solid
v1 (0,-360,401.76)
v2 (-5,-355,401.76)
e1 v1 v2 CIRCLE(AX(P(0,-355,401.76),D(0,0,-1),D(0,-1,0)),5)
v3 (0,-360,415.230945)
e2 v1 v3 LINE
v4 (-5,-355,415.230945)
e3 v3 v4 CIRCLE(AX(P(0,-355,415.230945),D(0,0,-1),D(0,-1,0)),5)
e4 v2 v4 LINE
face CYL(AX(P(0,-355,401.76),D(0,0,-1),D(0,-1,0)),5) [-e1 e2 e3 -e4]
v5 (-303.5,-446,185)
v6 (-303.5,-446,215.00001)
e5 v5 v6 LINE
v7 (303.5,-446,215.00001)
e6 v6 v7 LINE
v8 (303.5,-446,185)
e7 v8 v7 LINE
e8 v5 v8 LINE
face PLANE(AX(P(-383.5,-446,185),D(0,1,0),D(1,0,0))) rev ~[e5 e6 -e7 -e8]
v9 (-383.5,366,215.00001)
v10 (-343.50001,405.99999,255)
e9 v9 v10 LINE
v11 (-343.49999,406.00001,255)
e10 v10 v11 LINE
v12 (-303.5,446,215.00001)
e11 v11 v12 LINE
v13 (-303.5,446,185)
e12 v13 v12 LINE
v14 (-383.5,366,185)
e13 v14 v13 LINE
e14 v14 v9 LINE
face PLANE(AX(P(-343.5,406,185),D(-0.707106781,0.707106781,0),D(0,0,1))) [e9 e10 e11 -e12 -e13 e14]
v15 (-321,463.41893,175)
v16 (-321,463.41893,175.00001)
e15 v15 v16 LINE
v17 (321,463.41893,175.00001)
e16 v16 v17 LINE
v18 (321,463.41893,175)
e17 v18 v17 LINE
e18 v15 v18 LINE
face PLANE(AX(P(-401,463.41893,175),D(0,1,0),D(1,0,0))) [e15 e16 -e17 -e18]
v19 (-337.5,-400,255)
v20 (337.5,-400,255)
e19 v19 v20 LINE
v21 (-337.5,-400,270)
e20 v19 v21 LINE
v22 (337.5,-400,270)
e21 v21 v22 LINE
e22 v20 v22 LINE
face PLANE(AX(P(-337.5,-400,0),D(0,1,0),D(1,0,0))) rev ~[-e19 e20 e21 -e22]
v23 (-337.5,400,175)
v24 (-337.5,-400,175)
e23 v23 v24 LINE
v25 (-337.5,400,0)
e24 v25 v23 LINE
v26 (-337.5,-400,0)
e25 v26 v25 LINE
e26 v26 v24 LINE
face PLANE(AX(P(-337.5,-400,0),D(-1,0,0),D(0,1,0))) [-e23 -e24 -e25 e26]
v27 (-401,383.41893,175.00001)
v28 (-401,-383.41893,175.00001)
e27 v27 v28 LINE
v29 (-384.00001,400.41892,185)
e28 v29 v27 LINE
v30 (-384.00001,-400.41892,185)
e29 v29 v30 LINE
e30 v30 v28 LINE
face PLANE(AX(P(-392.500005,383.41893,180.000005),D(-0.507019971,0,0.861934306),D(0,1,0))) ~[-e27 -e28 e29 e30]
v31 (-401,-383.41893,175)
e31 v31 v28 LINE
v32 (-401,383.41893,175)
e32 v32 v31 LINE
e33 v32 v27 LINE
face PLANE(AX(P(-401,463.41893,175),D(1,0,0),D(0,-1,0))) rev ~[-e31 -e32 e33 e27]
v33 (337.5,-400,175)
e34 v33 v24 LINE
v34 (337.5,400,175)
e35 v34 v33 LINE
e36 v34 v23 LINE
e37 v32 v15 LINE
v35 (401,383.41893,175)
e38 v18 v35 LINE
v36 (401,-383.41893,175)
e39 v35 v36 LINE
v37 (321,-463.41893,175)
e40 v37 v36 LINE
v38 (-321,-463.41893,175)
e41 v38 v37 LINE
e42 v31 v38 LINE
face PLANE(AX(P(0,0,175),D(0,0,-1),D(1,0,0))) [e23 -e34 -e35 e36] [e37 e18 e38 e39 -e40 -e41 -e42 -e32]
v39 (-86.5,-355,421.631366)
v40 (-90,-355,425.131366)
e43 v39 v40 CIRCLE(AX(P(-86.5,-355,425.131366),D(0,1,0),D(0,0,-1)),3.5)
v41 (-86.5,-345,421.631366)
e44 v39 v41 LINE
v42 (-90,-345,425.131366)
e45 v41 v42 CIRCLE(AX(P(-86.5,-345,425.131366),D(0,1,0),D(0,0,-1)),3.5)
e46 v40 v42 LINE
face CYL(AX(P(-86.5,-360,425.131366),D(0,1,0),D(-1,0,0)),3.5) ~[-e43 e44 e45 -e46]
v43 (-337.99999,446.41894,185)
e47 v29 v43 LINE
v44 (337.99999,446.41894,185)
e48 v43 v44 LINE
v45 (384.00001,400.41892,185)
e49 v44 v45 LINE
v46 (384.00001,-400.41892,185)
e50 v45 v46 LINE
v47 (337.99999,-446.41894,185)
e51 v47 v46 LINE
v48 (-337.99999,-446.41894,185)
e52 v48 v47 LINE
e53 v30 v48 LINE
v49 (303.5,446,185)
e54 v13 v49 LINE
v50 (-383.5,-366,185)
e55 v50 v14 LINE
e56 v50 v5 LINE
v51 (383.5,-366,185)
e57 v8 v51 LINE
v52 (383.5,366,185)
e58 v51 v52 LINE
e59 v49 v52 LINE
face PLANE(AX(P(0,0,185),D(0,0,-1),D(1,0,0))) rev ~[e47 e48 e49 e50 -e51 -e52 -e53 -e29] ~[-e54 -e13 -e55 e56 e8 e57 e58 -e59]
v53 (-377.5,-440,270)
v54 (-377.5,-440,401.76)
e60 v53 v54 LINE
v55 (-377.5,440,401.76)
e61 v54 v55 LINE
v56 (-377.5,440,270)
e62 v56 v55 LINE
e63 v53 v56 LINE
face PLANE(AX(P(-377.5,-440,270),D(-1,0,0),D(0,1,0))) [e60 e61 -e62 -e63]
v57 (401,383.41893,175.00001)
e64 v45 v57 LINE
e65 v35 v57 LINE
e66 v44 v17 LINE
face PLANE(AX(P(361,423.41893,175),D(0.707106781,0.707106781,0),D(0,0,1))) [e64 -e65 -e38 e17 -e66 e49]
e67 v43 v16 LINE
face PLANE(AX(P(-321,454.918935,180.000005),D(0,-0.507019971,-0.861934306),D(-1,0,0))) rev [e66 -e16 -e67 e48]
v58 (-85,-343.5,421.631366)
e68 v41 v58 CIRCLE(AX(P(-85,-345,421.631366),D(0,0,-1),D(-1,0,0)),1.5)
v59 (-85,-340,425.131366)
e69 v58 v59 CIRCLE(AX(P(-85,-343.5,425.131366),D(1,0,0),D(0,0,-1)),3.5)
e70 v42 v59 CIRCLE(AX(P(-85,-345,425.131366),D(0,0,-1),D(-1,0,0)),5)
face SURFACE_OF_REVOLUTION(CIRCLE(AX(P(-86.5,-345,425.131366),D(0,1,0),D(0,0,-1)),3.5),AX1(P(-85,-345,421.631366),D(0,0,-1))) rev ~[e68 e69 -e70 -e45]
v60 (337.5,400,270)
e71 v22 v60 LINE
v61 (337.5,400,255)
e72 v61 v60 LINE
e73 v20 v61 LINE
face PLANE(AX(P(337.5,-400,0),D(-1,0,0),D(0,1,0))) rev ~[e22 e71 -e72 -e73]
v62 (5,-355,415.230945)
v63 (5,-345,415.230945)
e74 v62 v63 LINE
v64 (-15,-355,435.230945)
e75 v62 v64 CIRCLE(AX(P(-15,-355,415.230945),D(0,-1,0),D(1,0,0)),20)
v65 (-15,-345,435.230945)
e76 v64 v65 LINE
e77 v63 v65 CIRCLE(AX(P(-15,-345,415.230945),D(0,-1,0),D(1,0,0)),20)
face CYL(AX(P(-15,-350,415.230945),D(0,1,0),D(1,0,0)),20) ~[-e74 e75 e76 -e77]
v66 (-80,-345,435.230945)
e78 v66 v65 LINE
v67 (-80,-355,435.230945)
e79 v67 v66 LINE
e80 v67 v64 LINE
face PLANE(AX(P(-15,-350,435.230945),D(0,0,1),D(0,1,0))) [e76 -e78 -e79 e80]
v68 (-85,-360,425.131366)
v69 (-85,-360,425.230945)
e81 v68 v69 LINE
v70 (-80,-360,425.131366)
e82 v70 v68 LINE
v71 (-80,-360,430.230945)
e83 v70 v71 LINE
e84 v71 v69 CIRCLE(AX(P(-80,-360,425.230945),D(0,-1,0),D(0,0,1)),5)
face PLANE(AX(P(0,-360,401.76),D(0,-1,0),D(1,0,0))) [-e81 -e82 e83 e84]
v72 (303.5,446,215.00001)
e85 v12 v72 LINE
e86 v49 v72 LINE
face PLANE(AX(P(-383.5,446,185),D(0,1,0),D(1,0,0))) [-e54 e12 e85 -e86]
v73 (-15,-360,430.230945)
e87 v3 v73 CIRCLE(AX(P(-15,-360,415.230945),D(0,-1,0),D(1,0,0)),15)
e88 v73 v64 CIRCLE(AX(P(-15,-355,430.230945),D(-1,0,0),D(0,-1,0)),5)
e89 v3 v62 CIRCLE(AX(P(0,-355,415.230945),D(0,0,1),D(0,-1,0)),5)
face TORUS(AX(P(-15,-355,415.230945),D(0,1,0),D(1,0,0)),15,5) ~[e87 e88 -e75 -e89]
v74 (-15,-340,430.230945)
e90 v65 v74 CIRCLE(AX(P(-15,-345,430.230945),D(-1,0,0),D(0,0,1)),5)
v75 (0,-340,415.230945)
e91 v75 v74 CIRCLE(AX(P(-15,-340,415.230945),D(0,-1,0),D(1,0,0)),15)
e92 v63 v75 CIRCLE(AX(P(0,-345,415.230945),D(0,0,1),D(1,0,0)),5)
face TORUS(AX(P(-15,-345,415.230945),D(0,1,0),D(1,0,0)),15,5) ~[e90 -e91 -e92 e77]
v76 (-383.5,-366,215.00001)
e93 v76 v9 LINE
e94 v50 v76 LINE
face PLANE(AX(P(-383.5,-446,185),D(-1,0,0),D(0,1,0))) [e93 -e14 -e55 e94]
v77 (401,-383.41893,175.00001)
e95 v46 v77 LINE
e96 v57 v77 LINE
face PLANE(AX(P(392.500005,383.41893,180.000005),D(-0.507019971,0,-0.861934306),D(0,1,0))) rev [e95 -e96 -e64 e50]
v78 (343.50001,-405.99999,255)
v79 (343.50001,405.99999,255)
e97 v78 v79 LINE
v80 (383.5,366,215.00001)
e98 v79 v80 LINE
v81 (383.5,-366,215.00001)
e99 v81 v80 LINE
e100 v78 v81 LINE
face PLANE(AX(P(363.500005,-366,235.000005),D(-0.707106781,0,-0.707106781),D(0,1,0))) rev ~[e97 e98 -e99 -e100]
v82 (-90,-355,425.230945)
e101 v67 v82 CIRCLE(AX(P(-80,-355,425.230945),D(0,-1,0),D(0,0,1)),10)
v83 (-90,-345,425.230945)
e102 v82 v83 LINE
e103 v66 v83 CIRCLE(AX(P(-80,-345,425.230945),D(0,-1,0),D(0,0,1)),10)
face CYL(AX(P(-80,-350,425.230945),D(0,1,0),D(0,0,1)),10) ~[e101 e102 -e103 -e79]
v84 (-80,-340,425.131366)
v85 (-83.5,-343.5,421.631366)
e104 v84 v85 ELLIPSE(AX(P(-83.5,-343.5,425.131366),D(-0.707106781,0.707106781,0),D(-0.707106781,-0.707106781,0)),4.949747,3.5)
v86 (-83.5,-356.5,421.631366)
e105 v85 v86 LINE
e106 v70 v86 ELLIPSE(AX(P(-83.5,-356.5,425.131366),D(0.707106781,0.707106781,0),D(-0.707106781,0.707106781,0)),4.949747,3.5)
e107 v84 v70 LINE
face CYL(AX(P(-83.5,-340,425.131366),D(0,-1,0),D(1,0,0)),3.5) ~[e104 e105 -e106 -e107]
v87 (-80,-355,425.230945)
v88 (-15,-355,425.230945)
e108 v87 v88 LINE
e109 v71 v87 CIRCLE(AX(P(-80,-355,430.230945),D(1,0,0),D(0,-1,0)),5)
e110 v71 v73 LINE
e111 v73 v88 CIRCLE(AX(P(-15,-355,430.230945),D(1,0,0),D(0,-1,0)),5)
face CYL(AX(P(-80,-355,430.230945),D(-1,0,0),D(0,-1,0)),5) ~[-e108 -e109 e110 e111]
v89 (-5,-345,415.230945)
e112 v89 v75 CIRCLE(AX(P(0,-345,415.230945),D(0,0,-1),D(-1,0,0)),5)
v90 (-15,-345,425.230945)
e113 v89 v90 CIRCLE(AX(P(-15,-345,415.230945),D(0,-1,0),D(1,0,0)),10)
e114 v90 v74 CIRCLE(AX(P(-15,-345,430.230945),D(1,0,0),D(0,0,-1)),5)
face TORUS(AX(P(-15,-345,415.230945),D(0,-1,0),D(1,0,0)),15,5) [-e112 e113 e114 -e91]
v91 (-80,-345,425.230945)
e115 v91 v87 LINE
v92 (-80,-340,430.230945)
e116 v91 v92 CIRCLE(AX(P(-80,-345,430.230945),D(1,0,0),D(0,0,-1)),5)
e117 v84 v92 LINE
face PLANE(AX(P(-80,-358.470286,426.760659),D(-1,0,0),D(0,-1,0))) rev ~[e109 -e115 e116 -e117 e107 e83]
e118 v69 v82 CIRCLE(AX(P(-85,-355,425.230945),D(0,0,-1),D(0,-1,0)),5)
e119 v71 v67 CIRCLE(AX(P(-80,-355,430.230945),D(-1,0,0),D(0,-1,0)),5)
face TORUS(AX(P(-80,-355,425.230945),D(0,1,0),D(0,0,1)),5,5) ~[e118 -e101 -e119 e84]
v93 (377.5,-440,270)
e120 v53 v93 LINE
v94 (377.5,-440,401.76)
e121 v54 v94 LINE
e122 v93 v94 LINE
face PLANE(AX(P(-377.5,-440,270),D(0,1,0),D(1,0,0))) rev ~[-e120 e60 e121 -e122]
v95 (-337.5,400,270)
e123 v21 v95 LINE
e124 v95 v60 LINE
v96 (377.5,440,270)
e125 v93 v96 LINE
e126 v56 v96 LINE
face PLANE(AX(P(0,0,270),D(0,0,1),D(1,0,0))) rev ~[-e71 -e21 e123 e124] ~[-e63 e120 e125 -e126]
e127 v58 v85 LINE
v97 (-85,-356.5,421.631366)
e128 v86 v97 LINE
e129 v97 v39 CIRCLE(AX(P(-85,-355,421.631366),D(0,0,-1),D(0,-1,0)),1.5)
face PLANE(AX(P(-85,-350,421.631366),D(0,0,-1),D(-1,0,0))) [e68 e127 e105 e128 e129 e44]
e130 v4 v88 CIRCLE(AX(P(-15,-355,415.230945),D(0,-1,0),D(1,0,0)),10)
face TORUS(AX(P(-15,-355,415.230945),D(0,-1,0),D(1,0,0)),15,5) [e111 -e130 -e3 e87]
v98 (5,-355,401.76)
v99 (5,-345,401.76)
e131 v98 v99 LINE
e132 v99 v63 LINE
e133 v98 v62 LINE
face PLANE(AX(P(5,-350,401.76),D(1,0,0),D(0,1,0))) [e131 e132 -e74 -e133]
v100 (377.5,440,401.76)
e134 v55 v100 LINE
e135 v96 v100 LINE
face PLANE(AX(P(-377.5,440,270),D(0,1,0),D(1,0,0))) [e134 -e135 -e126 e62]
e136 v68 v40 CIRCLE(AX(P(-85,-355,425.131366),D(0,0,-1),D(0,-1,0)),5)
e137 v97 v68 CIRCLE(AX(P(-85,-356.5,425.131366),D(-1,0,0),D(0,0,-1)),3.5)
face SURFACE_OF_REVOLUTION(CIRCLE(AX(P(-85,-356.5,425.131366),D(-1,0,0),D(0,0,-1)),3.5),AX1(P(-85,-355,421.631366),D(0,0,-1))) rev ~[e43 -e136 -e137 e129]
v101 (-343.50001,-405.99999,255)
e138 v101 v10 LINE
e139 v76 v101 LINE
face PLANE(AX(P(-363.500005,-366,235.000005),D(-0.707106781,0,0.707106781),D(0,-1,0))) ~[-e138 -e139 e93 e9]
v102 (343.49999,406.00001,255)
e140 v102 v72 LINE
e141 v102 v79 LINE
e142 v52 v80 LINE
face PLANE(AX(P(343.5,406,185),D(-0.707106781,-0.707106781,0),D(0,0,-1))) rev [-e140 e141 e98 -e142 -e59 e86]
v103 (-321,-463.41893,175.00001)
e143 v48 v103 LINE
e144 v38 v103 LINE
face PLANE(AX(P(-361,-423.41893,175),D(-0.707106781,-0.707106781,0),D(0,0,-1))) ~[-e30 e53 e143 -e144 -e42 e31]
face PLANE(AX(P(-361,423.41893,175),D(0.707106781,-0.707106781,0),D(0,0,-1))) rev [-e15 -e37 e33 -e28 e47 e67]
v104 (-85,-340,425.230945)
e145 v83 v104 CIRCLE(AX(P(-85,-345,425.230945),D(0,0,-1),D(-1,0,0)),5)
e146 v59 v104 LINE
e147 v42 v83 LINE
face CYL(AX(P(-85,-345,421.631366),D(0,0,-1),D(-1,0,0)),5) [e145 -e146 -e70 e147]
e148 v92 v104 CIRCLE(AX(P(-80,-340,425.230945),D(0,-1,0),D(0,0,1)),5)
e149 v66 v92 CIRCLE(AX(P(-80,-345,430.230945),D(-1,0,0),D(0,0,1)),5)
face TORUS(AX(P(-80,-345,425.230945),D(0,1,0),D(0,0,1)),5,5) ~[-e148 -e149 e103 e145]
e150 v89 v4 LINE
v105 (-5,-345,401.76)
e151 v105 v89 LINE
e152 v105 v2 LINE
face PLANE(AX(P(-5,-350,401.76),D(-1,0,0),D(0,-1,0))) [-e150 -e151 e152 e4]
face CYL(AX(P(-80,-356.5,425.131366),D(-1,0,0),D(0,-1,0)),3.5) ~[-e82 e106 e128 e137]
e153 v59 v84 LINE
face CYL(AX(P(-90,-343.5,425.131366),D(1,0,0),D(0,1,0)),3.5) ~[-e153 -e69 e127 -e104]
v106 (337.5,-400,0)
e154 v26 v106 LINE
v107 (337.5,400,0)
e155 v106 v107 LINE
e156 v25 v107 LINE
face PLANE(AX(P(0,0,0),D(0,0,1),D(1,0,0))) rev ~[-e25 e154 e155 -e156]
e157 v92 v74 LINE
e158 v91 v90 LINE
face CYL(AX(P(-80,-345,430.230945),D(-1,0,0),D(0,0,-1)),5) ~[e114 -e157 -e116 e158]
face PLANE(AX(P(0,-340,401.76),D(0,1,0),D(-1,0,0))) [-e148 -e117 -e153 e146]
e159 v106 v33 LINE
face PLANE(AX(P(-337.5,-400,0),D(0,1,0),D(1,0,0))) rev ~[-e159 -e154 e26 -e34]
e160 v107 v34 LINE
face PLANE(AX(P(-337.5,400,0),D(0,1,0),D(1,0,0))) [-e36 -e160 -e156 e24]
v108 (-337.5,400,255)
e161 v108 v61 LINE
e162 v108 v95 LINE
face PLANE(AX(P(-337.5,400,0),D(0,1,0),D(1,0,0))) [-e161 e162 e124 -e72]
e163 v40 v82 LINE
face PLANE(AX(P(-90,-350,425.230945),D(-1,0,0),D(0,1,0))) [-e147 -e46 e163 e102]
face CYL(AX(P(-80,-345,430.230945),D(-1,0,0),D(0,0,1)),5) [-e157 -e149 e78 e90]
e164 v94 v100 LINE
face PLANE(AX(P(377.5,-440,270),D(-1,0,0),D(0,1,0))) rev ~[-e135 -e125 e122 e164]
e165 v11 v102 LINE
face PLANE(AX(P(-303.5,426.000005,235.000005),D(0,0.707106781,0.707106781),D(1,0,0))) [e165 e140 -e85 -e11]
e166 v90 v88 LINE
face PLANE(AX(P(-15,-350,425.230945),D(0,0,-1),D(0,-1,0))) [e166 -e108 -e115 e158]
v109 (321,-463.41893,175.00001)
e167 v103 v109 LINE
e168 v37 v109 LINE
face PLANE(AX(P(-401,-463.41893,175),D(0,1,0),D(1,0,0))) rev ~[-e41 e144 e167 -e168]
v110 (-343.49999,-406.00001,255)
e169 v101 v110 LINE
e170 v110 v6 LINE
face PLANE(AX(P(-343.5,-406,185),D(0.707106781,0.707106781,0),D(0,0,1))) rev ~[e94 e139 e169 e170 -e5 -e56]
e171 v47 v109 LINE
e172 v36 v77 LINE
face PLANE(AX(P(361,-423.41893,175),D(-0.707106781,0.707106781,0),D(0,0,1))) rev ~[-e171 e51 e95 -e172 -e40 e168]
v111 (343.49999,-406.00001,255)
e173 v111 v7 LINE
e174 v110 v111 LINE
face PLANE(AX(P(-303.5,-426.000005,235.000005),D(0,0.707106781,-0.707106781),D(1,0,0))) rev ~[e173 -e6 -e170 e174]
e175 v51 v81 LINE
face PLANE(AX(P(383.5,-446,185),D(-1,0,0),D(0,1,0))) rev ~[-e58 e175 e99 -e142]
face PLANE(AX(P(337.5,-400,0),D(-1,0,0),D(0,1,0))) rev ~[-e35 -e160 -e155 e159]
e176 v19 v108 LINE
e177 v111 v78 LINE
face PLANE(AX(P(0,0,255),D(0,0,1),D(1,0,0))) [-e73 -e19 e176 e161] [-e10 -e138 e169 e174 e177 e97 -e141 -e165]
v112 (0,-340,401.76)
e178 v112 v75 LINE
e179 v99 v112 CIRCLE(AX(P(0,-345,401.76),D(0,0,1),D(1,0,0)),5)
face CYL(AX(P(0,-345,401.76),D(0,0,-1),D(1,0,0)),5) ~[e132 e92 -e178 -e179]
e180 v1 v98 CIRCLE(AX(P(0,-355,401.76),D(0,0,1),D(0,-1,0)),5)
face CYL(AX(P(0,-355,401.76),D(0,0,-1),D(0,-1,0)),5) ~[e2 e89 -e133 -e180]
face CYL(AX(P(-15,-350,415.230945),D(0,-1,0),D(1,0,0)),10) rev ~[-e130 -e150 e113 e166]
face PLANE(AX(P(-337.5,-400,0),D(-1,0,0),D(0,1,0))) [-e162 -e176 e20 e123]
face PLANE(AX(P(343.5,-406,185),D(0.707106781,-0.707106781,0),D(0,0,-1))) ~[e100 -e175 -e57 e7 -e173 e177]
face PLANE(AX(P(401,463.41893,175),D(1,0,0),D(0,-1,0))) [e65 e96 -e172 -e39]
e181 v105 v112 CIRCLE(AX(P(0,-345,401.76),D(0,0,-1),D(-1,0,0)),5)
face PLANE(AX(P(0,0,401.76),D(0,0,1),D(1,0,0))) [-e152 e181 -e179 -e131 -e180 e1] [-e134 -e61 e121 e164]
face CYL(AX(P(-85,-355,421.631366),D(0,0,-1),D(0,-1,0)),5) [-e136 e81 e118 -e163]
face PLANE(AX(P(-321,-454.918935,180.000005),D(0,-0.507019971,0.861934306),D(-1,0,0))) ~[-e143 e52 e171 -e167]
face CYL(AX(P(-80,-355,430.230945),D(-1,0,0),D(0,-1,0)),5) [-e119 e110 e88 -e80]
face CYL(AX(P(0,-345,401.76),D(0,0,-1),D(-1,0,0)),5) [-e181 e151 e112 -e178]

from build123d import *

# Parameters (mm, degrees)
F0_W          = 675
F0_H          = 800
F1_DEPTH      = 270
F2_W          = 755
F2_H          = 880
F3_DEPTH      = 131.76
F5_START      = -175
F4_W          = 802
F4_H          = 926.8378600104
F5_DEPTH      = 10
F6_W          = 767
F6_H          = 892
F7_DEPTH      = 70
F8_SIZE       = 80
F9_SIZE       = 39.99999
F10_SIZE2     = 9.99999
F10_SIZE      = 16.99999
F13_W         = 10
F13_H         = 20
F15_R         = 3.5
F16_T1_DEPTH  = 65
F16_T3_DEPTH  = 3.5995793343
F16_T5_DEPTH  = 13.4709453487
F16_T8_ANGLE  = 90
F16_T10_ANGLE = 90
F16_T12_ANGLE = 90
F16_T14_ANGLE = 90
F16_T16_ANGLE = 90
F16_T18_ANGLE = 90
F16_T20_ANGLE = 90
F16_T22_ANGLE = 90


# Not quite as in the source:
# - a fillet or chamfer that OpenCascade refuses, or shapes differently, is made with other operations: its cross-section is extruded or revolved along the edge and cut away or added
# - a fillet or chamfer is up to 0.001 mm smaller than in the source, because OpenCascade refuses the exact size
# - a feature names something its author has since deleted; it is built from what else it names


with BuildPart() as f1:
    # F0 (on Top) → F1 (new body)
    with BuildSketch(Plane.XY):
        Rectangle(F0_W, F0_H)
    extrude(amount=F1_DEPTH)

    # F2 (on face) → F3 (join)
    with BuildSketch(Plane.XY.offset(270)):
        Rectangle(F2_W, F2_H)
    extrude(amount=F3_DEPTH)

    # F4 (on face) → F5 (join)
    with BuildSketch(Plane(origin=(0, 0, 0), x_dir=(1, 0, 0), z_dir=(0, 0, -1)).offset(F5_START)):
        Rectangle(F4_W, F4_H)
    extrude(amount=-F5_DEPTH)

    # F6 (on face) → F7 (join)
    with BuildSketch(Plane.XY.offset(185)):
        Rectangle(F6_W, F6_H)
    extrude(amount=F7_DEPTH)

    # F8
    f8_edges = [f1.edges().sort_by_distance(p)[0] for p in [
        (383.5, 446, 220),
        (-383.5, 446, 220),
        (-383.5, -446, 220),
        (-401, 463.41893, 180),
        (-401, -463.41893, 180),
        (401, 463.41893, 180),
        (401, -463.41893, 180),
        (383.5, -446, 220),
    ]]
    chamfer(f8_edges, length=F8_SIZE)

    # F9 (size 40 in the source; OpenCascade refuses exactly that, so slightly less here)
    f9_edges = [f1.edges().sort_by_distance(p)[0] for p in [
        (383.5, 0, 255),
        (-383.5, 0, 255),
        (0, 446, 255),
        (0, -446, 255),
    ]]
    chamfer(f9_edges, length=F9_SIZE)

    # F10 (size 17 and 10 in the source; OpenCascade refuses exactly that, so slightly less here)
    f10_edges = [f1.edges().sort_by_distance(p)[0] for p in [
        (-401, 0, 185),
        (0, 463.41893, 185),
        (0, -463.41893, 185),
        (401, 0, 185),
    ]]
    chamfer(f10_edges, length=F10_SIZE, length2=F10_SIZE2)

    # F14: sweep along a path in F12
    with BuildLine(Plane.XZ.offset(350)) as f14_path:
        Line((0, 401.76), (0, 415.2309453487))
        ThreePointArc((0, 415.2309453487), (-4.3933982822, 425.8375470665), (-15, 430.2309453487))
        Line((-15, 430.2309453487), (-80, 430.2309453487))
        ThreePointArc((-80, 430.2309453487), (-83.5355339059, 428.7664792547), (-85, 425.2309453487))
        Line((-85, 425.2309453487), (-85, 421.6313660145))
    # F13 (on face) → F14 (sweep)
    with BuildSketch(Plane.XY.offset(401.76)):
        with Locations((0, -350)):
            Rectangle(F13_W, F13_H)
    sweep(path=f14_path.line)

    # F15
    f15_edges = [f1.edges().sort_by_distance(p)[0] for p in [
        (-90, -350, 421.631366),
        (-85, -360, 421.631366),
        (-80, -350, 421.631366),
        (-85, -340, 421.631366),
    ]]
    fillet(f15_edges, radius=F15_R)

    # F16: fillet of radius 5 on 16 edges, made by hand

    # F16_s2 → F16_t1 (cut)
    with BuildSketch(Plane.YZ.offset(-80)):
        with BuildLine():
            ThreePointArc((-360, 430.2309453487), (-358.5355339059, 433.7664792547), (-355, 435.2309453487))
            Line((-355, 435.2309453487), (-360, 435.2309453487))
            Line((-360, 435.2309453487), (-360, 430.2309453487))
        make_face()
        with BuildLine():
            ThreePointArc((-345, 435.2309453487), (-341.4644660941, 433.7664792547), (-340, 430.2309453487))
            Line((-340, 430.2309453487), (-340, 435.2309453487))
            Line((-340, 435.2309453487), (-345, 435.2309453487))
        make_face()
        with BuildLine():
            ThreePointArc((-360, 430.2309453487), (-358.5355339059, 426.6954114428), (-355, 425.2309453487))
            Line((-355, 425.2309453487), (-360, 425.2309453487))
            Line((-360, 425.2309453487), (-360, 430.2309453487))
        make_face()
        with BuildLine():
            ThreePointArc((-345, 425.2309453487), (-341.4644660941, 426.6954114428), (-340, 430.2309453487))
            Line((-340, 430.2309453487), (-340, 425.2309453487))
            Line((-340, 425.2309453487), (-345, 425.2309453487))
        make_face()
    extrude(amount=F16_T1_DEPTH, mode=Mode.SUBTRACT)

    # F16_s4 → F16_t3 (cut)
    with BuildSketch(Plane.XY.offset(421.6313660145)):
        with BuildLine():
            ThreePointArc((-85, -360), (-88.5355339059, -358.5355339059), (-90, -355))
            Line((-90, -355), (-90, -360))
            Line((-90, -360), (-85, -360))
        make_face()
        with BuildLine():
            ThreePointArc((-90, -345), (-88.5355339059, -341.4644660941), (-85, -340))
            Line((-85, -340), (-90, -340))
            Line((-90, -340), (-90, -345))
        make_face()
    extrude(amount=F16_T3_DEPTH, mode=Mode.SUBTRACT)

    # F16_s6 → F16_t5 (cut)
    with BuildSketch(Plane.XY.offset(401.76)):
        with BuildLine():
            ThreePointArc((0, -360), (3.5355339059, -358.5355339059), (5, -355))
            Line((5, -355), (5, -360))
            Line((5, -360), (0, -360))
        make_face()
        with BuildLine():
            ThreePointArc((0, -360), (-3.5355339059, -358.5355339059), (-5, -355))
            Line((-5, -355), (-5, -360))
            Line((-5, -360), (0, -360))
        make_face()
        with BuildLine():
            ThreePointArc((5, -345), (3.5355339059, -341.4644660941), (0, -340))
            Line((0, -340), (5, -340))
            Line((5, -340), (5, -345))
        make_face()
        with BuildLine():
            ThreePointArc((-5, -345), (-3.5355339059, -341.4644660941), (0, -340))
            Line((0, -340), (-5, -340))
            Line((-5, -340), (-5, -345))
        make_face()
    extrude(amount=F16_T5_DEPTH, mode=Mode.SUBTRACT)

    # F16_s7 → F16_t8 (revolve, cut)
    with BuildSketch(Plane.XZ.offset(345)):
        with BuildLine():
            ThreePointArc((-86.5, 421.6313660145), (-88.9748737342, 422.6564922803), (-90, 425.1313660145))
            Line((-90, 425.1313660145), (-90, 421.6313660145))
            Line((-90, 421.6313660145), (-86.5, 421.6313660145))
        make_face()
    revolve(axis=Axis((-85, -345, 421.6313660145), (0, 0, -1)), revolution_arc=F16_T8_ANGLE, mode=Mode.SUBTRACT)

    # F16_s9 → F16_t10 (revolve, cut)
    with BuildSketch(Plane.YZ.offset(-85)):
        with BuildLine():
            ThreePointArc((-356.5, 421.6313660145), (-358.9748737342, 422.6564922803), (-360, 425.1313660145))
            Line((-360, 425.1313660145), (-360, 421.6313660145))
            Line((-360, 421.6313660145), (-356.5, 421.6313660145))
        make_face()
    revolve(axis=Axis((-85, -355, 421.6313660145), (0, 0, -1)), revolution_arc=F16_T10_ANGLE, mode=Mode.SUBTRACT)

    # F16_s11 → F16_t12 (revolve, cut)
    with BuildSketch(Plane.YZ.offset(-80)):
        with BuildLine():
            ThreePointArc((-360, 430.2309453487), (-358.5355339059, 433.7664792547), (-355, 435.2309453487))
            Line((-355, 435.2309453487), (-360, 435.2309453487))
            Line((-360, 435.2309453487), (-360, 430.2309453487))
        make_face()
    revolve(axis=Axis((-80, -360, 425.2309453487), (0, -1, 0)), revolution_arc=F16_T12_ANGLE, mode=Mode.SUBTRACT)

    # F16_s13 → F16_t14 (revolve, cut)
    with BuildSketch(Plane.XY.offset(415.2309453487)):
        with BuildLine():
            ThreePointArc((0, -360), (3.5355339059, -358.5355339059), (5, -355))
            Line((5, -355), (5, -360))
            Line((5, -360), (0, -360))
        make_face()
    revolve(axis=Axis((-15, -360, 415.2309453487), (0, -1, 0)), revolution_arc=F16_T14_ANGLE, mode=Mode.SUBTRACT)

    # F16_s15 → F16_t16 (revolve, cut)
    with BuildSketch(Plane.XY.offset(415.2309453487)):
        with BuildLine():
            ThreePointArc((0, -360), (-3.5355339059, -358.5355339059), (-5, -355))
            Line((-5, -355), (-5, -360))
            Line((-5, -360), (0, -360))
        make_face()
    revolve(axis=Axis((-15, -360, 415.2309453487), (0, -1, 0)), revolution_arc=F16_T16_ANGLE, mode=Mode.SUBTRACT)

    # F16_s17 → F16_t18 (revolve, cut)
    with BuildSketch(Plane.YZ.offset(-80)):
        with BuildLine():
            ThreePointArc((-345, 435.2309453487), (-341.4644660941, 433.7664792547), (-340, 430.2309453487))
            Line((-340, 430.2309453487), (-340, 435.2309453487))
            Line((-340, 435.2309453487), (-345, 435.2309453487))
        make_face()
    revolve(axis=Axis((-80, -340, 425.2309453487), (0, -1, 0)), revolution_arc=F16_T18_ANGLE, mode=Mode.SUBTRACT)

    # F16_s19 → F16_t20 (revolve, cut)
    with BuildSketch(Plane.XY.offset(415.2309453487)):
        with BuildLine():
            ThreePointArc((5, -345), (3.5355339059, -341.4644660941), (0, -340))
            Line((0, -340), (5, -340))
            Line((5, -340), (5, -345))
        make_face()
    revolve(axis=Axis((-15, -340, 415.2309453487), (0, -1, 0)), revolution_arc=F16_T20_ANGLE, mode=Mode.SUBTRACT)

    # F16_s21 → F16_t22 (revolve, cut)
    with BuildSketch(Plane.XY.offset(415.2309453487)):
        with BuildLine():
            ThreePointArc((-5, -345), (-3.5355339059, -341.4644660941), (0, -340))
            Line((0, -340), (-5, -340))
            Line((-5, -340), (-5, -345))
        make_face()
    revolve(axis=Axis((-15, -340, 415.2309453487), (0, -1, 0)), revolution_arc=F16_T22_ANGLE, mode=Mode.SUBTRACT)


solid = f1.part
